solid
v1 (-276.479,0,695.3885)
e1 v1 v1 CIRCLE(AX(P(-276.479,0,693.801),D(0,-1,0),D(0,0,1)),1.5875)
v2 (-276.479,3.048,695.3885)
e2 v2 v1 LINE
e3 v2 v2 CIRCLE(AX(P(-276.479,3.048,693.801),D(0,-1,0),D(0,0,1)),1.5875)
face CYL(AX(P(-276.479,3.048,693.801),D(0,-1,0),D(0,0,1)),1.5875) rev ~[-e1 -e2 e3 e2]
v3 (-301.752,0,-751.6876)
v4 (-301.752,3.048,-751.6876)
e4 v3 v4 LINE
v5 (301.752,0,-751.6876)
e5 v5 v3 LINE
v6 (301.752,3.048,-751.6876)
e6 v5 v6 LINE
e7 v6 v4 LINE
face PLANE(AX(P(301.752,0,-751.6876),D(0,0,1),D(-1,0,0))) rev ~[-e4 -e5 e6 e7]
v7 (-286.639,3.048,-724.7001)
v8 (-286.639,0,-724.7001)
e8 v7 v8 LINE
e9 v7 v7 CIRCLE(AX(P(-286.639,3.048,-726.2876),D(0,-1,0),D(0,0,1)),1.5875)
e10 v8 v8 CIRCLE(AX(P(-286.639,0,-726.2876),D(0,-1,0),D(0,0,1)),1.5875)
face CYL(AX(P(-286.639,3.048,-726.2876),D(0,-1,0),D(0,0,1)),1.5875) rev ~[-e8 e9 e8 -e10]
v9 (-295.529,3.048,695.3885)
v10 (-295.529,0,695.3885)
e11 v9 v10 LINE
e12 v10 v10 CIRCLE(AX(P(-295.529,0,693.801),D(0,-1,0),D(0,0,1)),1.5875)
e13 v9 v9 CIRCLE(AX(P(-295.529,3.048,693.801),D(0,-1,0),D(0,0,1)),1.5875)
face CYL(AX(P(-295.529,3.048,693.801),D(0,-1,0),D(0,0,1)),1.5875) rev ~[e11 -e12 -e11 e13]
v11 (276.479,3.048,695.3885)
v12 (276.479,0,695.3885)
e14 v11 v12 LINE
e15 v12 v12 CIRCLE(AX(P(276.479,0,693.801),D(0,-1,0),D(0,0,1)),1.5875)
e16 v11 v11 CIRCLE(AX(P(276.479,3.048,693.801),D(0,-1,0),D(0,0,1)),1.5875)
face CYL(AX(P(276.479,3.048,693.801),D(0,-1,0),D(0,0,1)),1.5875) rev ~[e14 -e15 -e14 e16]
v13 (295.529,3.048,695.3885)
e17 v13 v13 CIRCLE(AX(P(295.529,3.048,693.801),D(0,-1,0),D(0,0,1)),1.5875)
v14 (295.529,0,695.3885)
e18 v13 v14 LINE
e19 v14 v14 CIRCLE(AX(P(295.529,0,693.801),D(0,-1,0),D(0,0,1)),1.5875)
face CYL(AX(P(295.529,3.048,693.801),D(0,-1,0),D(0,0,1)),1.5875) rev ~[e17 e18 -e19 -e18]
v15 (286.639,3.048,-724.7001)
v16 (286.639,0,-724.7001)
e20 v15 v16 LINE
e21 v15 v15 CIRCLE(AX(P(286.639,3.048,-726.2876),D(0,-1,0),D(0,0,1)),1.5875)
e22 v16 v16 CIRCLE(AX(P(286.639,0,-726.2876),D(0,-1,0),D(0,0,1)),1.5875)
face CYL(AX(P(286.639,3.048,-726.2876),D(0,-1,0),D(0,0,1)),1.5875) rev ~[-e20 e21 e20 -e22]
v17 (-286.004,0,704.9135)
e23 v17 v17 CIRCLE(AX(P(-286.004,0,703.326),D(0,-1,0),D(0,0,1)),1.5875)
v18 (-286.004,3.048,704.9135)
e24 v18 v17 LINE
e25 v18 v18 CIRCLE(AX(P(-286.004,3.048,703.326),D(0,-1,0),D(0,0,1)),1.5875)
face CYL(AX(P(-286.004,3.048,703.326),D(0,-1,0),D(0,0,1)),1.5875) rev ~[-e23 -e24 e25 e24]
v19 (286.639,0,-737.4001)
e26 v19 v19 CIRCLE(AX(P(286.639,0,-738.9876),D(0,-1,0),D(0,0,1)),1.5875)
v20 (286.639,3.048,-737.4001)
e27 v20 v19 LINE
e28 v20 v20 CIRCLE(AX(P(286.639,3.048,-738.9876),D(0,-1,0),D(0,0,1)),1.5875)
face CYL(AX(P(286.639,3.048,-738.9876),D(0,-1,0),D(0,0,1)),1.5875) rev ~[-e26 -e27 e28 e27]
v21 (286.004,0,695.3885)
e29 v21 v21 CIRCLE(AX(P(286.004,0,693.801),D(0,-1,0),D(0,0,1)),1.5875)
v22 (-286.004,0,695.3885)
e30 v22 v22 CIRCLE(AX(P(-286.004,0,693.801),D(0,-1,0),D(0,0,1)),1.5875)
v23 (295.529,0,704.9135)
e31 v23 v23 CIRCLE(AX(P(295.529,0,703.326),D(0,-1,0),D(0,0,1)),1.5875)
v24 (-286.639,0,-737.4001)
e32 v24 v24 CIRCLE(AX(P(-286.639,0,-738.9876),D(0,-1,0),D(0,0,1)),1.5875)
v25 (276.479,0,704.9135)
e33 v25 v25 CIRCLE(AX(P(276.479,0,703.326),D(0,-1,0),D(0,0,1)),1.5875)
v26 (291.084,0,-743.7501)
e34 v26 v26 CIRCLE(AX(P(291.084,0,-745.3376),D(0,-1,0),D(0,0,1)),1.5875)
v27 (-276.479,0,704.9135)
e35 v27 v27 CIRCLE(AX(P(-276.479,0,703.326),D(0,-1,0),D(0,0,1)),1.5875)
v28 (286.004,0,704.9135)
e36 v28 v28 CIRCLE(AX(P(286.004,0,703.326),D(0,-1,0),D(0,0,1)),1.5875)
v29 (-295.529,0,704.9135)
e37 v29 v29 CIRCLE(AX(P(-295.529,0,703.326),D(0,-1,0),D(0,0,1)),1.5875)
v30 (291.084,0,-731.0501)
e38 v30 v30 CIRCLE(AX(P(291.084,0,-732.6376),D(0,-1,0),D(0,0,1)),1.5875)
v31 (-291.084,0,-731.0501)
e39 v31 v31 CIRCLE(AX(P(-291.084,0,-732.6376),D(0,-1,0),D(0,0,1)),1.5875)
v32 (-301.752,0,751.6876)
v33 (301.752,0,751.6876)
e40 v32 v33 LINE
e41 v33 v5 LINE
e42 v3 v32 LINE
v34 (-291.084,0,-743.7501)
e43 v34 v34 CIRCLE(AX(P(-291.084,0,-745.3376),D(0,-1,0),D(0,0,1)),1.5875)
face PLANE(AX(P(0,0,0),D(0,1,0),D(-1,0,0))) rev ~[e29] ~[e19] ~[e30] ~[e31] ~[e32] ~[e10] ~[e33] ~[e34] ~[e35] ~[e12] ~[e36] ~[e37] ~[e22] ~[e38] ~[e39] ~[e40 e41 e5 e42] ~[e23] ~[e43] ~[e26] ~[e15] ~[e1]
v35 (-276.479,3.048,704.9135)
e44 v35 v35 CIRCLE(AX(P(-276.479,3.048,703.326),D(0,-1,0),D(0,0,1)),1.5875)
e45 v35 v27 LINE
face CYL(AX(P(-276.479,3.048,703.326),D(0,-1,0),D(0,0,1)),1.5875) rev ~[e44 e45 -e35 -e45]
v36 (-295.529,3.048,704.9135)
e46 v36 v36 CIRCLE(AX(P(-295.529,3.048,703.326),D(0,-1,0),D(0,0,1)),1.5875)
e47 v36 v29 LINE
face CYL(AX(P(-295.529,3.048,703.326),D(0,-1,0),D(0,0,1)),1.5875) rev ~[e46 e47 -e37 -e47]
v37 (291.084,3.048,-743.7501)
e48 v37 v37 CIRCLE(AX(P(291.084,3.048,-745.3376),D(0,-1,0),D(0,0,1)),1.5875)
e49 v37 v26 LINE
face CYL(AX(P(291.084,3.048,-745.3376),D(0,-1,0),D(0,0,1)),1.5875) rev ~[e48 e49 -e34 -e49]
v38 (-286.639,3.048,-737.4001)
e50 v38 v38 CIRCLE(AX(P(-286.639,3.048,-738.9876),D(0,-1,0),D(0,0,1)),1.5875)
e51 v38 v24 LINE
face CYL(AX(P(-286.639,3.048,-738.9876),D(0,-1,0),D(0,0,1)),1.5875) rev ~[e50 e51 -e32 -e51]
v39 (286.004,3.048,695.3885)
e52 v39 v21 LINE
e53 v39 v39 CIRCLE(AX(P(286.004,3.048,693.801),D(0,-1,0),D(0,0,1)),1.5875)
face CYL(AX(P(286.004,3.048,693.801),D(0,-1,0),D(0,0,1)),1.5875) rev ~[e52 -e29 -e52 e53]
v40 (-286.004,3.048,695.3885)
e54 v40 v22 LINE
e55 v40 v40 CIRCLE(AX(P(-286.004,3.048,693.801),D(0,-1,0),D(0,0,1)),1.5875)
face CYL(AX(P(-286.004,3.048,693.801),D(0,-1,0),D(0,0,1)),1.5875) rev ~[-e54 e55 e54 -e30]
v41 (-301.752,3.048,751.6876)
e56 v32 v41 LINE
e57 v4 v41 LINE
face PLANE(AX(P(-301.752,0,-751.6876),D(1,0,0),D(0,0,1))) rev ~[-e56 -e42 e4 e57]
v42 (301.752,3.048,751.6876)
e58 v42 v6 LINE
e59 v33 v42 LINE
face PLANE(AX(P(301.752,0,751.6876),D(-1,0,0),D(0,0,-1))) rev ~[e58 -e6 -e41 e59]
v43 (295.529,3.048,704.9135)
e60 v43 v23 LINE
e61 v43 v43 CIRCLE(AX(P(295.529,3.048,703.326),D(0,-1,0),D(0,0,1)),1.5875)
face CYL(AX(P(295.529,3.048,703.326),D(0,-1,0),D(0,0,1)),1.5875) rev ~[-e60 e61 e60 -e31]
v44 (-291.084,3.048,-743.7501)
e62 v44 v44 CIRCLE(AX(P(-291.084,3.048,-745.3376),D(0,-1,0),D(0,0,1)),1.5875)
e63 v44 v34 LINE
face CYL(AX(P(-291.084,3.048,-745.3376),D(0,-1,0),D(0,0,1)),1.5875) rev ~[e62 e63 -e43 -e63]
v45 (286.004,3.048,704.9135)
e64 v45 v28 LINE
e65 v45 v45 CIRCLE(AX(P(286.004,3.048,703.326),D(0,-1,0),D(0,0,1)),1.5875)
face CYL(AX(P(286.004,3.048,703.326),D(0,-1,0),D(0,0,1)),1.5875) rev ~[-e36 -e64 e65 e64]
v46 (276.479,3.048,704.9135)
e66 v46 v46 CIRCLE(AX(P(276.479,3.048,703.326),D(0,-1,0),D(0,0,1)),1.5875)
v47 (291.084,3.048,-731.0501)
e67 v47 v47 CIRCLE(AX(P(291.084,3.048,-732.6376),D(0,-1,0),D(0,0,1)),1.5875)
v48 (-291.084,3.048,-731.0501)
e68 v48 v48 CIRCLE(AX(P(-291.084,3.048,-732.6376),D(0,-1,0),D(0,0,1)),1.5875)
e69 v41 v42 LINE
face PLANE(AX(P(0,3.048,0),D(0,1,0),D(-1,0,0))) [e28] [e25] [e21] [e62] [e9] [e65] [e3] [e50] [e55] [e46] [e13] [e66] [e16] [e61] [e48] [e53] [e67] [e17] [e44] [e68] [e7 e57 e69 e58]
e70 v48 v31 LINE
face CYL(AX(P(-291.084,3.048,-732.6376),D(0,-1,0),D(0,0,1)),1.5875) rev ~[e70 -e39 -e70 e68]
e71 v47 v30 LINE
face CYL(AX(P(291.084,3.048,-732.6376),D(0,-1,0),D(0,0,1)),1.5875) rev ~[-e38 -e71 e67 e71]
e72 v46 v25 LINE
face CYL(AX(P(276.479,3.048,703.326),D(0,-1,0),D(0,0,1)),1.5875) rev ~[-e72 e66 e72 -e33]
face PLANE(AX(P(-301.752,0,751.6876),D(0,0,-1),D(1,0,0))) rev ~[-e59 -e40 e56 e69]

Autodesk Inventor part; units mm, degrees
ref_plane "YZ Plane" through (0, 0, 0) normal (1, 0, 0) x (0, 1, 0)
ref_plane "XZ Plane" through (0, 0, 0) normal (0, 1, 0) x (-1, 0, 0)
ref_plane "XY Plane" through (0, 0, 0) normal (0, 0, 1) x (1, 0, 0)
sketch "Sketch2" plane through (0, 0, 0) normal (0, 1, 0) x (-1, 0, 0)
  line L0 (-301.752, -751.6876) -> (301.752, -751.6876)
  line L1 (301.752, -751.6876) -> (301.752, 751.6876)
  line L2 (301.752, 751.6876) -> (-301.752, 751.6876)
  line L3 (-301.752, 751.6876) -> (-301.752, -751.6876)
  point P0 (0, 0)
  dimension "d0" = 301.752
  dimension "d1" = 301.752
  dimension "d2" = 751.6876
  dimension "d3" = 751.6876
extrude "Plate1" add sketch "Sketch2" along normal blind 3.048
sketch "Sketch3" plane through (0, 3.048, 0) normal (0, 1, 0) x (1, 0, 0)
  line L0 (301.752, 751.6876) -> (301.752, -751.6876) projected
  line L1 (-301.752, -751.6876) -> (-301.752, 751.6876) projected
  line L2 (301.752, -751.6876) -> (-301.752, -751.6876) projected
  point P0 (0, 0)
  point P1 (-295.529, -693.801)
  point P2 (276.479, -693.801)
  dimension "d5" = 6.223
  dimension "d6" = 25.273
  dimension "d22" = 57.8866
  dimension "d23" = 57.8866
hole "Hole1" at (-295.529, 3.048, 693.801) at (276.479, 3.048, 693.801) direction (0, -1, 0) diameter 3.175 end through all
sketch "Sketch4" plane through (0, 3.048, 0) normal (0, 1, 0) x (1, 0, 0)
  circle A0 centre (-295.529, -693.801) radius 1.5875 projected
  line L0 (301.752, -751.6876) -> (-301.752, -751.6876) projected
  line L1 (-295.529, -693.801) -> (-270.8654, -693.801)
  point P0 (0, 0)
sketch "Sketch5" plane through (0, 3.048, 0) normal (0, 1, 0) x (1, 0, 0)
  circle A0 centre (-295.529, -693.801) radius 1.5875 projected
  line L0 (301.752, -751.6876) -> (-301.752, -751.6876) projected
  line L1 (-295.529, -693.801) -> (-295.529, -711.9838)
  line L2 (301.752, 751.6876) -> (301.752, -751.6876) projected
  point P0 (0, 0)
pattern_linear "Rectangular Pattern1" count 3 spacing 9.525 along (1, 0, 0) count 2 spacing 9.525 along (0, 0, 1) of "Hole1"
sketch "Sketch6" plane through (0, 3.048, 0) normal (0, 1, 0) x (1, 0, 0)
  line L0 (301.752, 751.6876) -> (301.752, -751.6876) projected
  line L1 (-301.752, 751.6876) -> (301.752, 751.6876) projected
  line L2 (-301.752, -751.6876) -> (-301.752, 751.6876) projected
  point P0 (0, 0)
  point P1 (291.084, 745.3376)
  point P2 (286.639, 738.9876)
  point P3 (291.084, 732.6376)
  point P4 (286.639, 726.2876)
  point P5 (-291.084, 745.3376)
  point P6 (-286.639, 738.9876)
  point P7 (-291.084, 732.6376)
  point P8 (-286.639, 726.2876)
  dimension "d24" = 10.668
  dimension "d25" = 4.445
  dimension "d26" = 6.35
  dimension "d27" = 6.35
  dimension "d28" = 6.35
  dimension "d29" = 6.35
  dimension "d30" = 10.668
  dimension "d31" = 4.445
hole "Hole2" at (291.084, 3.048, -745.3376) at (286.639, 3.048, -738.9876) at (291.084, 3.048, -732.6376) at (286.639, 3.048, -726.2876) at (-291.084, 3.048, -745.3376) at (-286.639, 3.048, -738.9876) at (-291.084, 3.048, -732.6376) at (-286.639, 3.048, -726.2876) direction (0, -1, 0) diameter 3.175 end through all
equation "\"d23\" = d22"
equation "\"d14\" = Thickness"
equation "\"d37\" = Thickness"
equation "\"d1\" = d0"
equation "\"d3\" = d2"
equation "\"BendRadius\" = Thickness"
equation "\"BendReliefWidth\" = Thickness"
equation "\"BendReliefDepth\" = 0.5 * Thickness"
equation "\"CornerReliefSize\" = 4 * Thickness"
equation "\"MinimumRemnant\" = 2 * Thickness"
equation "\"TransitionRadius\" = BendRadius"
equation "\"JacobiRadiusSize\" = BendRadius"
equation "\"GapSize\" = Thickness"
equation "\"d4\" = BendRadius"
equation "\"Thickness\" = 3.048"
properties part number "Base Top"
